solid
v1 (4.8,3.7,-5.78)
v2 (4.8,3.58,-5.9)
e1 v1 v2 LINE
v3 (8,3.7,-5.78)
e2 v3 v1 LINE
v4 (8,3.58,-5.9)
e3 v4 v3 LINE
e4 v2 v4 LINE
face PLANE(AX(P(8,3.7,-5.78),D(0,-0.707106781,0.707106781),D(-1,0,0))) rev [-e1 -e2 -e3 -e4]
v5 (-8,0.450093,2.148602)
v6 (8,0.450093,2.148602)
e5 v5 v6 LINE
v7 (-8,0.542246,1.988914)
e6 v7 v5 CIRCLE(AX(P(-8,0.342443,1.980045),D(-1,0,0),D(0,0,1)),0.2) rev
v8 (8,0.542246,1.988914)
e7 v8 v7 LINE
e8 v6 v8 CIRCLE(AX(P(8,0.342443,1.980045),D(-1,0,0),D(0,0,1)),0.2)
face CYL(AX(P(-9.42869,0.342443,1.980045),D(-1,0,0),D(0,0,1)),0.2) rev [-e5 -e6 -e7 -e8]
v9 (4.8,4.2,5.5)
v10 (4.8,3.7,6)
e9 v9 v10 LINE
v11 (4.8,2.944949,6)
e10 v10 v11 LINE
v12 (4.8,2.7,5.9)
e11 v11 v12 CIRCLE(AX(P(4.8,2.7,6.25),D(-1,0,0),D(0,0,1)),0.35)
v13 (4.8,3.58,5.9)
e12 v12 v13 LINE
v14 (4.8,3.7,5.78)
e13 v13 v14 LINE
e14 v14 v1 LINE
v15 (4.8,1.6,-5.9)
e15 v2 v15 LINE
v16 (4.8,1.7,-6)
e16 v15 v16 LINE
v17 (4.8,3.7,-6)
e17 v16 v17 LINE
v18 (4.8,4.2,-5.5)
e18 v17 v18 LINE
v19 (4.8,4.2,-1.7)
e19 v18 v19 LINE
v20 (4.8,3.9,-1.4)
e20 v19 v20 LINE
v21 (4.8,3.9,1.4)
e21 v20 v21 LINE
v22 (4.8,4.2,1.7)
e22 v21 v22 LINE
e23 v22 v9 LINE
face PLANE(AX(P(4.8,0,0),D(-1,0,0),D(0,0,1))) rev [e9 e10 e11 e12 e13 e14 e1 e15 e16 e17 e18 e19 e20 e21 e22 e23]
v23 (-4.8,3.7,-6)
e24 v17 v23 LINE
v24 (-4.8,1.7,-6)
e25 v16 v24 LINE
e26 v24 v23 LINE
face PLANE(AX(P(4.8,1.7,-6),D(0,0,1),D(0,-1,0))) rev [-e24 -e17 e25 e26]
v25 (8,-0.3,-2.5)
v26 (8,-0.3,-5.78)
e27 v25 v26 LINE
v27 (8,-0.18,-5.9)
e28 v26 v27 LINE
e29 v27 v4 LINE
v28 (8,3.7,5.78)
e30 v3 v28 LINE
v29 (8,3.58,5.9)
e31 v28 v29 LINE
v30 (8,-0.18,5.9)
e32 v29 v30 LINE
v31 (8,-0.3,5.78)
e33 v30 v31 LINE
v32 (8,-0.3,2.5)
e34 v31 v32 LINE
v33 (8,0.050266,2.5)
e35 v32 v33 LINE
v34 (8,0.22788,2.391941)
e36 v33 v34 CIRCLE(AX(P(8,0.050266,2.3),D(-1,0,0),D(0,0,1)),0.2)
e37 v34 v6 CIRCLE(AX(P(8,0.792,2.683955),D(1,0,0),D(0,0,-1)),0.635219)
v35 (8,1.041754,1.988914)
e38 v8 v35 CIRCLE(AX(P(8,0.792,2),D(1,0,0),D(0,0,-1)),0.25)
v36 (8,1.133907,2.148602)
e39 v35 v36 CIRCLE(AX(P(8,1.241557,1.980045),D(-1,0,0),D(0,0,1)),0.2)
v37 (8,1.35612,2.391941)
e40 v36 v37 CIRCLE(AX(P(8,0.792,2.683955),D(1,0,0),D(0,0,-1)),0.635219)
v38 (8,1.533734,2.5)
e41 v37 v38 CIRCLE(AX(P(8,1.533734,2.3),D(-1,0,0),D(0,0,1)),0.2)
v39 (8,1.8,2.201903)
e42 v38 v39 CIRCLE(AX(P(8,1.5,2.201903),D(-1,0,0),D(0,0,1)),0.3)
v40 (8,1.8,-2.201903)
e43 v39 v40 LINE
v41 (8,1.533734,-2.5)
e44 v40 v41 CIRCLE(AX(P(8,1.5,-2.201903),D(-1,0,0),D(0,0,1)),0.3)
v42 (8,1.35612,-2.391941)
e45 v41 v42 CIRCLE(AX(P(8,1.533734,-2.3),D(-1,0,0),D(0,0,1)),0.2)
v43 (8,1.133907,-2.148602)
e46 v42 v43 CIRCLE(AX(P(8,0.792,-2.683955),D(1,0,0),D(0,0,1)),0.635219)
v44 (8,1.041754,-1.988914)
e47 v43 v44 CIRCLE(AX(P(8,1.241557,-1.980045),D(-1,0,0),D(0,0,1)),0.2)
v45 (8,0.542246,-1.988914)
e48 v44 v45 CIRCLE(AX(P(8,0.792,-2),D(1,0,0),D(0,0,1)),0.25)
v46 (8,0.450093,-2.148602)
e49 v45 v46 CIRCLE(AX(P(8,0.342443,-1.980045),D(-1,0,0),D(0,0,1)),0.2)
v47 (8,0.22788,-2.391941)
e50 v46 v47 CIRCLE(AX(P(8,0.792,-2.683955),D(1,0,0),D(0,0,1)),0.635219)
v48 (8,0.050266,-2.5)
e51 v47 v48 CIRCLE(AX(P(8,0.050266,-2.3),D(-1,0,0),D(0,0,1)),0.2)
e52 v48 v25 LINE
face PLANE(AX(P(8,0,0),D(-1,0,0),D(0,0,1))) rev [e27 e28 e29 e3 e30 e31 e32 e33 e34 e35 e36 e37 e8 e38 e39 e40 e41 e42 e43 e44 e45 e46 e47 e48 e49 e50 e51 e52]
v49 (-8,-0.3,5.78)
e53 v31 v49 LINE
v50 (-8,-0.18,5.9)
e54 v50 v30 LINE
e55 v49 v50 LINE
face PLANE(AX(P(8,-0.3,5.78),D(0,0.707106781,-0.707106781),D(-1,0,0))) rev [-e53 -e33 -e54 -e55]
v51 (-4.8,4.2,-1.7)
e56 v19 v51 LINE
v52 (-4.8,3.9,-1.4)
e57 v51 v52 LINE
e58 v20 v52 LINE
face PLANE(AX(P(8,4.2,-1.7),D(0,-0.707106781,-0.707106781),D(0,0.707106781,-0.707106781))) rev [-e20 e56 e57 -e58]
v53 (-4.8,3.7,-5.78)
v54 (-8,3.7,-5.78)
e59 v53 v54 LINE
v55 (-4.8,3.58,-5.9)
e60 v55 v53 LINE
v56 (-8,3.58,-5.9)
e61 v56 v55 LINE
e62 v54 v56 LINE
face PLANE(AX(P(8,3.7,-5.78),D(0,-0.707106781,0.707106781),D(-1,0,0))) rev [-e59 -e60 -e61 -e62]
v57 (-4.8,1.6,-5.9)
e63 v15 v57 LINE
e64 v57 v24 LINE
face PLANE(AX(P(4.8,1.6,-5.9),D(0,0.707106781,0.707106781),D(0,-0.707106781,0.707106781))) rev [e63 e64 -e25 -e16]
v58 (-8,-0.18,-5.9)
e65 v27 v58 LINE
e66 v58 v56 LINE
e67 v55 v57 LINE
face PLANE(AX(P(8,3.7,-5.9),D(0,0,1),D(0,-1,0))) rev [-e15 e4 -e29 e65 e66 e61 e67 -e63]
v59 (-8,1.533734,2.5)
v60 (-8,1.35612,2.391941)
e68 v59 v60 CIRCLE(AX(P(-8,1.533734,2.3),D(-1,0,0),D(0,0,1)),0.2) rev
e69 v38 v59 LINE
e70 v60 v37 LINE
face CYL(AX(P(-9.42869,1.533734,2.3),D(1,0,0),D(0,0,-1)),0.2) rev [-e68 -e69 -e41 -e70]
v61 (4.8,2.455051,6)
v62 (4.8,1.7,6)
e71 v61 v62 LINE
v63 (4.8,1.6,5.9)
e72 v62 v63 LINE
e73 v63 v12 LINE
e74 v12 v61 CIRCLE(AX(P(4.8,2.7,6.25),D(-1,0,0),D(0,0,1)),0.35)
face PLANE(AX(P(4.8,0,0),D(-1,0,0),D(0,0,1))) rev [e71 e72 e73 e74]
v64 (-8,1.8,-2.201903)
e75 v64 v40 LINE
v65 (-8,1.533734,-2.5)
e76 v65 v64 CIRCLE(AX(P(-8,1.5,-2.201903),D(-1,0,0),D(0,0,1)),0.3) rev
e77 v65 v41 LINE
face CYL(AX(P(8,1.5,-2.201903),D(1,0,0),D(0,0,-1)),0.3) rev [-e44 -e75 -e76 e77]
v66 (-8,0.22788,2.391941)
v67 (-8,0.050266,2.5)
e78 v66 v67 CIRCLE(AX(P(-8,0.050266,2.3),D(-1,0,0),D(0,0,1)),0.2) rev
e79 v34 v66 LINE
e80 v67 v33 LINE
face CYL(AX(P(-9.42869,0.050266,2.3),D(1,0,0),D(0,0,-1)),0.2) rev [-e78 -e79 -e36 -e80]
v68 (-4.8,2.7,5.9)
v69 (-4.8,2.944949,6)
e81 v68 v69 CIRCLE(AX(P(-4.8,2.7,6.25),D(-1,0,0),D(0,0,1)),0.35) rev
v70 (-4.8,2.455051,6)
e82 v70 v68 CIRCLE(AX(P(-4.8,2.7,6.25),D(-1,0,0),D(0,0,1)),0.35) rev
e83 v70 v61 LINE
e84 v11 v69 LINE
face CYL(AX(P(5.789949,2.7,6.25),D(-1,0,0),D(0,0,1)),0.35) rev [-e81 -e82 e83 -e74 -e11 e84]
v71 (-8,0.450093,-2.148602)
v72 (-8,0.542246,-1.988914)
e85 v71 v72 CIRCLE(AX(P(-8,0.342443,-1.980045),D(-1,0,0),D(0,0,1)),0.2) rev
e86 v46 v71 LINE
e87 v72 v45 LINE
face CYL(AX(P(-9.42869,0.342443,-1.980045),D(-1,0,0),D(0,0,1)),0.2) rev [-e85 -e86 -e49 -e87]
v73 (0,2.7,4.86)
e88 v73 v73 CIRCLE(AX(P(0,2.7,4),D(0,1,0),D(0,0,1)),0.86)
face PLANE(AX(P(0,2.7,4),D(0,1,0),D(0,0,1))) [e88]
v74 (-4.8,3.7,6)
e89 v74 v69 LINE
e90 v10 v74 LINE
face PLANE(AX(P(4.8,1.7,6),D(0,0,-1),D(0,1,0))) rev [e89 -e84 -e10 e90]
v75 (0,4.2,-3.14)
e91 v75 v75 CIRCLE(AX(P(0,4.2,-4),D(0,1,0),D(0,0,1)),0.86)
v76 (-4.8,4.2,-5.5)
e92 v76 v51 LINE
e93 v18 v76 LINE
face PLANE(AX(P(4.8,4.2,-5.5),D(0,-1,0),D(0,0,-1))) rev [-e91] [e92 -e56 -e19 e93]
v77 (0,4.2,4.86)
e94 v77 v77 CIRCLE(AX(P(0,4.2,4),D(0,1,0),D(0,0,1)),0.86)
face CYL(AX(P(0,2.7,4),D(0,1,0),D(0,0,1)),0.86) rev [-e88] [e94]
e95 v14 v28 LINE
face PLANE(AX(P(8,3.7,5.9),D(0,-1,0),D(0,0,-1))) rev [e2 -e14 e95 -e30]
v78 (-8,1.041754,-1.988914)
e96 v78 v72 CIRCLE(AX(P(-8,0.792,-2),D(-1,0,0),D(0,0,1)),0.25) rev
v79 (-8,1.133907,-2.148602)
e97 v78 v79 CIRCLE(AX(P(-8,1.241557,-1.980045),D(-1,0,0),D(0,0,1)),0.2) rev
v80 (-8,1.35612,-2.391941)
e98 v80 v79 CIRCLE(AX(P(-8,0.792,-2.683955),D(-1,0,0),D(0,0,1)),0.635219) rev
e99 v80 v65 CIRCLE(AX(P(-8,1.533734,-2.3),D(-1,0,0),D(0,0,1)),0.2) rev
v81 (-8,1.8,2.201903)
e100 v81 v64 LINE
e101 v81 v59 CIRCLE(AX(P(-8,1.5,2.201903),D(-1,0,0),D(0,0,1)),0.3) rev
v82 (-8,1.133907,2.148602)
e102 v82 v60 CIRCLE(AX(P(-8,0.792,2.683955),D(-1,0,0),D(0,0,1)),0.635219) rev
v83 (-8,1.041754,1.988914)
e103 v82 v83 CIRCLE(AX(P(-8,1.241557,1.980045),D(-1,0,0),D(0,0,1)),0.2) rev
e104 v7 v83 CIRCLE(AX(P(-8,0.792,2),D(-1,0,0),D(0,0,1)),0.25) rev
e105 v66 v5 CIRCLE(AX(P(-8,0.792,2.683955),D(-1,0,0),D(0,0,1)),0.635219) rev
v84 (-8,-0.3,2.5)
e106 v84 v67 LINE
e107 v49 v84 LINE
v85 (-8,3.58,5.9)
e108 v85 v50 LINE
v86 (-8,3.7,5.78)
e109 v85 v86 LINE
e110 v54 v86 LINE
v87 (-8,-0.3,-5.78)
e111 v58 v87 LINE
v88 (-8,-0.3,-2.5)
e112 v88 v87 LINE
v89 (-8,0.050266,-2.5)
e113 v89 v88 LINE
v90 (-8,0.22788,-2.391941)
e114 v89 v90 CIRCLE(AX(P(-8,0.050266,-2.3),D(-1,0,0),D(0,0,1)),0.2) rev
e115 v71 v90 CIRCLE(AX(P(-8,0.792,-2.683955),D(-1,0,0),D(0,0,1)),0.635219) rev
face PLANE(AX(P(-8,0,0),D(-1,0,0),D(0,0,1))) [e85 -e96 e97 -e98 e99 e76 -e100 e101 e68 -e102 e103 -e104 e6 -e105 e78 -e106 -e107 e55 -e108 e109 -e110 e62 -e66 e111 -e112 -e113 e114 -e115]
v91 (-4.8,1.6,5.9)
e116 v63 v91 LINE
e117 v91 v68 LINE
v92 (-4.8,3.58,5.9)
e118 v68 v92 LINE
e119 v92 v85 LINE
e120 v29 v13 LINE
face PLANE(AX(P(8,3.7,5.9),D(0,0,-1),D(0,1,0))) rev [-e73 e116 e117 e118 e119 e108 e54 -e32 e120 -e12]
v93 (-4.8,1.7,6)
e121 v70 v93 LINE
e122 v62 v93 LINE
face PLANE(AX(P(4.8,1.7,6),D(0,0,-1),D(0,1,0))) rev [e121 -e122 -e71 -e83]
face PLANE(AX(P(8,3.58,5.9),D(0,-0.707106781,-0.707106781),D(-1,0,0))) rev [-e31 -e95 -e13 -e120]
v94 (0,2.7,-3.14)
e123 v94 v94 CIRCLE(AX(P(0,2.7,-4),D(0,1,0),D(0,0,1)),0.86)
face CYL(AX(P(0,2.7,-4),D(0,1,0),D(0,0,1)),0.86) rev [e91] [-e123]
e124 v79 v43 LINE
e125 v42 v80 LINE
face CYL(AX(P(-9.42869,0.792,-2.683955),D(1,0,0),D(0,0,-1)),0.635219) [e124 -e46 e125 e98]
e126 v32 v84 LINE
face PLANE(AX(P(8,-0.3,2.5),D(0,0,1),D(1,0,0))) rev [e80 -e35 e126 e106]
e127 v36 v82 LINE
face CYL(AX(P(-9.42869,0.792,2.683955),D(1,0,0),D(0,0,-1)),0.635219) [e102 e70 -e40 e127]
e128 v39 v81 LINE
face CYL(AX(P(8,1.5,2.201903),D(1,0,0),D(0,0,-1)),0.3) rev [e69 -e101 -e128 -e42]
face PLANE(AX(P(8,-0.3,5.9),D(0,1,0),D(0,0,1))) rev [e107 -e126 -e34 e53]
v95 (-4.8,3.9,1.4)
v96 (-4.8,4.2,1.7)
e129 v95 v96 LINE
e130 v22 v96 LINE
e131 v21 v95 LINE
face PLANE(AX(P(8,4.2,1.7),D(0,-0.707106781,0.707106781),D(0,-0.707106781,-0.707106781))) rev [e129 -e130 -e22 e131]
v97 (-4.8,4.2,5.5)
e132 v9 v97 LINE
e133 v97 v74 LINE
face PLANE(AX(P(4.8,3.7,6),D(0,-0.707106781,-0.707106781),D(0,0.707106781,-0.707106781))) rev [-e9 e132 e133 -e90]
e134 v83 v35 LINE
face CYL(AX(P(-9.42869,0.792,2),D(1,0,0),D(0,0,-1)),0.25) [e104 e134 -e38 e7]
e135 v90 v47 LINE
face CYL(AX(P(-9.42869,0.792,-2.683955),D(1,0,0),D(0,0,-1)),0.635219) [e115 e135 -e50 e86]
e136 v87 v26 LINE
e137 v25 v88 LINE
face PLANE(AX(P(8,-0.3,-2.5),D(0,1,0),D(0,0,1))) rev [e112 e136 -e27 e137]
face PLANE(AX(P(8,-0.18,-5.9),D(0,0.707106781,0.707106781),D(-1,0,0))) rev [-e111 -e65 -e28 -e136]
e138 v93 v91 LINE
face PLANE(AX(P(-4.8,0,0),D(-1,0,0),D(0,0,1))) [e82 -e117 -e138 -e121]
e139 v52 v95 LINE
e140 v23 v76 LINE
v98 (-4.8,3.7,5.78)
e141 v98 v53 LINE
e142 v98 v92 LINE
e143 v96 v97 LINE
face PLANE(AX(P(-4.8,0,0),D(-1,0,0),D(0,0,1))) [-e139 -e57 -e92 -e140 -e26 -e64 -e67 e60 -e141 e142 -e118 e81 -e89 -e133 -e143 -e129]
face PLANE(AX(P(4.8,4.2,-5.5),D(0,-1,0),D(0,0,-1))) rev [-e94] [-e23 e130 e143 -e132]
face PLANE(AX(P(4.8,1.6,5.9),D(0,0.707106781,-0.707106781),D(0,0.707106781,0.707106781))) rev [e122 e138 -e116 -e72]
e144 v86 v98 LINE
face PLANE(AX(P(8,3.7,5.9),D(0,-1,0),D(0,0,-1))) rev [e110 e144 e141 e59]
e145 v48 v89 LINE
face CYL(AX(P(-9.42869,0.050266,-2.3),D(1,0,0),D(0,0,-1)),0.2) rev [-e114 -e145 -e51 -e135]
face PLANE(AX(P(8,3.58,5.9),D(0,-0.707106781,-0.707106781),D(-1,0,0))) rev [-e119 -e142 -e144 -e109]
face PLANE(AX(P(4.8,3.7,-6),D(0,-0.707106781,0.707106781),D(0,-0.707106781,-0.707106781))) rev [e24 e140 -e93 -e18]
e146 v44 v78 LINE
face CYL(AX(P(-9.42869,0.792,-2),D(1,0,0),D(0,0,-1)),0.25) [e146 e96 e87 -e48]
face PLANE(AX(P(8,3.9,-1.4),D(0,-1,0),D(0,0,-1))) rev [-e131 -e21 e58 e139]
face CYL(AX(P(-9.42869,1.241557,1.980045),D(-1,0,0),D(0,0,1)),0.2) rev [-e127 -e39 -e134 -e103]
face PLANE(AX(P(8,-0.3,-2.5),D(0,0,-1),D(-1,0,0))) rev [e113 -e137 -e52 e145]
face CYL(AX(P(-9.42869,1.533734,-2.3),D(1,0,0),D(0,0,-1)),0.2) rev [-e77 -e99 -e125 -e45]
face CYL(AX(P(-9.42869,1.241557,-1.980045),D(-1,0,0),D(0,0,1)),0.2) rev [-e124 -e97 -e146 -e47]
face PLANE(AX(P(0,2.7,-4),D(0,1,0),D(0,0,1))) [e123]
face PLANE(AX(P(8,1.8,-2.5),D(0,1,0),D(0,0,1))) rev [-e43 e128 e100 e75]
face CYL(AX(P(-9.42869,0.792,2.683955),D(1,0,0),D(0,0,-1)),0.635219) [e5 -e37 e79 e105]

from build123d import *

# Parameters (mm, degrees)
EXTRUDE_1_DEPTH     = 8
EXTRUDE_2_DEPTH     = 4.8
EXTRUDE_3_DEPTH     = 16
CUT_EXTRUDE_1_DEPTH = 15.747203125
CUT_EXTRUDE_START   = -4.8
SKETCH_5_R          = 0.35
CUT_EXTRUDE_2_DEPTH = 9.6
CHAMFER_1_SIZE      = 0.12
FILLET_1_R          = 0.2
FILLET_2_R          = 0.3
SKETCH_12_R         = 0.86
CUT_EXTRUDE_4_DEPTH = 1.5


with BuildPart() as part:
    # 草图1 → 凸台-拉伸1 (new, symmetric)
    with BuildSketch(Plane(origin=(0, 0, 0), x_dir=(0, 0, -1), z_dir=(1, 0, 0))):
        Polygon((-5.9, 3.7), (5.9, 3.7), (5.9, -0.3), (2.5, -0.3), (2.5, 1.8), (-2.5, 1.8), (-2.5, -0.3), (-5.9, -0.3), align=None)
    extrude(amount=EXTRUDE_1_DEPTH, both=True)

    # 草图2 → 凸台-拉伸2 (add, symmetric)
    with BuildSketch(Plane(origin=(0, 0, 0), x_dir=(0, 0, -1), z_dir=(1, 0, 0))):
        Polygon((6, 1.7), (6, 3.7), (5.5, 4.2), (-5.5, 4.2), (-6, 3.7), (-6, 1.7), (-5.9, 1.6), (-5.9, 3.7), (5.9, 3.7), (5.9, 1.6), align=None)
    extrude(amount=EXTRUDE_2_DEPTH, both=True)

    # 草图11 → 凸台-拉伸3 (add)
    with BuildSketch(Plane(origin=(8, 0, 0), x_dir=(0, 0, -1), z_dir=(1, 0, 0))):
        with BuildLine():
            Line((-2, 1.042), (-2.1, 1.042))
            ThreePointArc((-2.1, 1.042), (-2.260324923, 1.265329695), (-2.5, 1.4))
            Line((-2.5, 1.4), (-2.5, 0.184))
            ThreePointArc((-2.5, 0.184), (-2.260324923, 0.318670305), (-2.1, 0.542))
            Line((-2.1, 0.542), (-2, 0.542))
            ThreePointArc((-2, 0.542), (-1.75, 0.792), (-2, 1.042))
        make_face()
        with BuildLine():
            Line((2.5, 1.4), (2.5, 0.184))
            ThreePointArc((2.5, 0.184), (2.260324923, 0.318670305), (2.1, 0.542))
            Line((2.1, 0.542), (2, 0.542))
            ThreePointArc((2, 0.542), (1.75, 0.792), (2, 1.042))
            Line((2, 1.042), (2.1, 1.042))
            ThreePointArc((2.1, 1.042), (2.260324923, 1.265329695), (2.5, 1.4))
        make_face()
    extrude(amount=-EXTRUDE_3_DEPTH)

    # 草图3 → 切除-拉伸1 (cut, through all)
    with BuildSketch(Plane.ZY.offset(4.8)):
        Polygon((1.7, 4.2), (1.4, 3.9), (-1.4, 3.9), (-1.7, 4.2), align=None)
    extrude(amount=-CUT_EXTRUDE_1_DEPTH, mode=Mode.SUBTRACT)

    # 草图5 → 切除-拉伸2 (cut)
    with BuildSketch(Plane(origin=(0, 0, 0), x_dir=(0, 0, -1), z_dir=(1, 0, 0)).offset(CUT_EXTRUDE_START)):
        with Locations((-6.25, 2.7)):
            Circle(SKETCH_5_R)
    extrude(amount=CUT_EXTRUDE_2_DEPTH, mode=Mode.SUBTRACT)

    # 倒角1
    chamfer_1_edges = [part.edges().sort_by_distance(p)[0] for p in [
        (0, -0.3, 5.9),
        (6.4, 3.7, 5.9),
        (6.4, 3.7, -5.9),
        (0, -0.3, -5.9),
        (-6.4, 3.7, 5.9),
        (-6.4, 3.7, -5.9),
    ]]
    chamfer(chamfer_1_edges, length=CHAMFER_1_SIZE)

    # 圆角1
    fillet_1_edges = [part.edges().sort_by_distance(p)[0] for p in [
        (0, 0.184, -2.5),
        (0, 0.542, -2.1),
        (0, 1.042, -2.1),
        (0, 1.4, -2.5),
        (0, 0.184, 2.5),
        (0, 0.542, 2.1),
        (0, 1.042, 2.1),
        (0, 1.4, 2.5),
    ]]
    fillet(fillet_1_edges, radius=FILLET_1_R)

    # 圆角2
    # the kernel refuses this fillet: 0.3 mm, written as the material it adds along each edge
    with BuildSketch(Plane(origin=(8, 1.8, 2.5), x_dir=(0, -1, 0), z_dir=(-1, 0, 0))) as fillet_2_piece_1:
        with BuildLine():
            CenterArc((0.3, -0.298097301), FILLET_2_R, 96.456420664, 83.543579336)
            Line((0, -0.298097301), (-0.006, -0.298097301))
            Line((-0.006, -0.298097301), (-0.006, 0))
            Line((-0.006, 0), (0, 0.006))
            ThreePointArc((0, 0.006), (0.13313288, 0.006), (0.265591075, 0.005961946))
            Line((0.265591075, 0.005961946), (0.26626576, 0))
        make_face()
    extrude(amount=16)
    with BuildSketch(Plane(origin=(8, 1.8, -2.5), x_dir=(0, 0, 1), z_dir=(-1, 0, 0))) as fillet_2_piece_2:
        with BuildLine():
            CenterArc((0.298097301, -0.3), FILLET_2_R, 90, 83.543579336)
            Line((0, -0.26626576), (-0.005961946, -0.265591075))
            ThreePointArc((-0.005961946, -0.265591075), (-0.006, -0.13313288), (-0.006, 0))
            Line((-0.006, 0), (0, 0.006))
            Line((0, 0.006), (0.298097301, 0.006))
            Line((0.298097301, 0.006), (0.298097301, 0))
        make_face()
    extrude(amount=16)

    # 草图12 → 切除-拉伸4 (cut)
    with BuildSketch(Plane(origin=(0, 4.2, 0), x_dir=(1, 0, 0), z_dir=(0, 1, 0))):
        with Locations(Location((0, 4, 0), (0, 0, 270))):
            Circle(SKETCH_12_R)
        with Locations(Location((0, -4, 0), (0, 0, 270))):
            Circle(SKETCH_12_R)
    extrude(amount=-CUT_EXTRUDE_4_DEPTH, mode=Mode.SUBTRACT)


solid = part.part
